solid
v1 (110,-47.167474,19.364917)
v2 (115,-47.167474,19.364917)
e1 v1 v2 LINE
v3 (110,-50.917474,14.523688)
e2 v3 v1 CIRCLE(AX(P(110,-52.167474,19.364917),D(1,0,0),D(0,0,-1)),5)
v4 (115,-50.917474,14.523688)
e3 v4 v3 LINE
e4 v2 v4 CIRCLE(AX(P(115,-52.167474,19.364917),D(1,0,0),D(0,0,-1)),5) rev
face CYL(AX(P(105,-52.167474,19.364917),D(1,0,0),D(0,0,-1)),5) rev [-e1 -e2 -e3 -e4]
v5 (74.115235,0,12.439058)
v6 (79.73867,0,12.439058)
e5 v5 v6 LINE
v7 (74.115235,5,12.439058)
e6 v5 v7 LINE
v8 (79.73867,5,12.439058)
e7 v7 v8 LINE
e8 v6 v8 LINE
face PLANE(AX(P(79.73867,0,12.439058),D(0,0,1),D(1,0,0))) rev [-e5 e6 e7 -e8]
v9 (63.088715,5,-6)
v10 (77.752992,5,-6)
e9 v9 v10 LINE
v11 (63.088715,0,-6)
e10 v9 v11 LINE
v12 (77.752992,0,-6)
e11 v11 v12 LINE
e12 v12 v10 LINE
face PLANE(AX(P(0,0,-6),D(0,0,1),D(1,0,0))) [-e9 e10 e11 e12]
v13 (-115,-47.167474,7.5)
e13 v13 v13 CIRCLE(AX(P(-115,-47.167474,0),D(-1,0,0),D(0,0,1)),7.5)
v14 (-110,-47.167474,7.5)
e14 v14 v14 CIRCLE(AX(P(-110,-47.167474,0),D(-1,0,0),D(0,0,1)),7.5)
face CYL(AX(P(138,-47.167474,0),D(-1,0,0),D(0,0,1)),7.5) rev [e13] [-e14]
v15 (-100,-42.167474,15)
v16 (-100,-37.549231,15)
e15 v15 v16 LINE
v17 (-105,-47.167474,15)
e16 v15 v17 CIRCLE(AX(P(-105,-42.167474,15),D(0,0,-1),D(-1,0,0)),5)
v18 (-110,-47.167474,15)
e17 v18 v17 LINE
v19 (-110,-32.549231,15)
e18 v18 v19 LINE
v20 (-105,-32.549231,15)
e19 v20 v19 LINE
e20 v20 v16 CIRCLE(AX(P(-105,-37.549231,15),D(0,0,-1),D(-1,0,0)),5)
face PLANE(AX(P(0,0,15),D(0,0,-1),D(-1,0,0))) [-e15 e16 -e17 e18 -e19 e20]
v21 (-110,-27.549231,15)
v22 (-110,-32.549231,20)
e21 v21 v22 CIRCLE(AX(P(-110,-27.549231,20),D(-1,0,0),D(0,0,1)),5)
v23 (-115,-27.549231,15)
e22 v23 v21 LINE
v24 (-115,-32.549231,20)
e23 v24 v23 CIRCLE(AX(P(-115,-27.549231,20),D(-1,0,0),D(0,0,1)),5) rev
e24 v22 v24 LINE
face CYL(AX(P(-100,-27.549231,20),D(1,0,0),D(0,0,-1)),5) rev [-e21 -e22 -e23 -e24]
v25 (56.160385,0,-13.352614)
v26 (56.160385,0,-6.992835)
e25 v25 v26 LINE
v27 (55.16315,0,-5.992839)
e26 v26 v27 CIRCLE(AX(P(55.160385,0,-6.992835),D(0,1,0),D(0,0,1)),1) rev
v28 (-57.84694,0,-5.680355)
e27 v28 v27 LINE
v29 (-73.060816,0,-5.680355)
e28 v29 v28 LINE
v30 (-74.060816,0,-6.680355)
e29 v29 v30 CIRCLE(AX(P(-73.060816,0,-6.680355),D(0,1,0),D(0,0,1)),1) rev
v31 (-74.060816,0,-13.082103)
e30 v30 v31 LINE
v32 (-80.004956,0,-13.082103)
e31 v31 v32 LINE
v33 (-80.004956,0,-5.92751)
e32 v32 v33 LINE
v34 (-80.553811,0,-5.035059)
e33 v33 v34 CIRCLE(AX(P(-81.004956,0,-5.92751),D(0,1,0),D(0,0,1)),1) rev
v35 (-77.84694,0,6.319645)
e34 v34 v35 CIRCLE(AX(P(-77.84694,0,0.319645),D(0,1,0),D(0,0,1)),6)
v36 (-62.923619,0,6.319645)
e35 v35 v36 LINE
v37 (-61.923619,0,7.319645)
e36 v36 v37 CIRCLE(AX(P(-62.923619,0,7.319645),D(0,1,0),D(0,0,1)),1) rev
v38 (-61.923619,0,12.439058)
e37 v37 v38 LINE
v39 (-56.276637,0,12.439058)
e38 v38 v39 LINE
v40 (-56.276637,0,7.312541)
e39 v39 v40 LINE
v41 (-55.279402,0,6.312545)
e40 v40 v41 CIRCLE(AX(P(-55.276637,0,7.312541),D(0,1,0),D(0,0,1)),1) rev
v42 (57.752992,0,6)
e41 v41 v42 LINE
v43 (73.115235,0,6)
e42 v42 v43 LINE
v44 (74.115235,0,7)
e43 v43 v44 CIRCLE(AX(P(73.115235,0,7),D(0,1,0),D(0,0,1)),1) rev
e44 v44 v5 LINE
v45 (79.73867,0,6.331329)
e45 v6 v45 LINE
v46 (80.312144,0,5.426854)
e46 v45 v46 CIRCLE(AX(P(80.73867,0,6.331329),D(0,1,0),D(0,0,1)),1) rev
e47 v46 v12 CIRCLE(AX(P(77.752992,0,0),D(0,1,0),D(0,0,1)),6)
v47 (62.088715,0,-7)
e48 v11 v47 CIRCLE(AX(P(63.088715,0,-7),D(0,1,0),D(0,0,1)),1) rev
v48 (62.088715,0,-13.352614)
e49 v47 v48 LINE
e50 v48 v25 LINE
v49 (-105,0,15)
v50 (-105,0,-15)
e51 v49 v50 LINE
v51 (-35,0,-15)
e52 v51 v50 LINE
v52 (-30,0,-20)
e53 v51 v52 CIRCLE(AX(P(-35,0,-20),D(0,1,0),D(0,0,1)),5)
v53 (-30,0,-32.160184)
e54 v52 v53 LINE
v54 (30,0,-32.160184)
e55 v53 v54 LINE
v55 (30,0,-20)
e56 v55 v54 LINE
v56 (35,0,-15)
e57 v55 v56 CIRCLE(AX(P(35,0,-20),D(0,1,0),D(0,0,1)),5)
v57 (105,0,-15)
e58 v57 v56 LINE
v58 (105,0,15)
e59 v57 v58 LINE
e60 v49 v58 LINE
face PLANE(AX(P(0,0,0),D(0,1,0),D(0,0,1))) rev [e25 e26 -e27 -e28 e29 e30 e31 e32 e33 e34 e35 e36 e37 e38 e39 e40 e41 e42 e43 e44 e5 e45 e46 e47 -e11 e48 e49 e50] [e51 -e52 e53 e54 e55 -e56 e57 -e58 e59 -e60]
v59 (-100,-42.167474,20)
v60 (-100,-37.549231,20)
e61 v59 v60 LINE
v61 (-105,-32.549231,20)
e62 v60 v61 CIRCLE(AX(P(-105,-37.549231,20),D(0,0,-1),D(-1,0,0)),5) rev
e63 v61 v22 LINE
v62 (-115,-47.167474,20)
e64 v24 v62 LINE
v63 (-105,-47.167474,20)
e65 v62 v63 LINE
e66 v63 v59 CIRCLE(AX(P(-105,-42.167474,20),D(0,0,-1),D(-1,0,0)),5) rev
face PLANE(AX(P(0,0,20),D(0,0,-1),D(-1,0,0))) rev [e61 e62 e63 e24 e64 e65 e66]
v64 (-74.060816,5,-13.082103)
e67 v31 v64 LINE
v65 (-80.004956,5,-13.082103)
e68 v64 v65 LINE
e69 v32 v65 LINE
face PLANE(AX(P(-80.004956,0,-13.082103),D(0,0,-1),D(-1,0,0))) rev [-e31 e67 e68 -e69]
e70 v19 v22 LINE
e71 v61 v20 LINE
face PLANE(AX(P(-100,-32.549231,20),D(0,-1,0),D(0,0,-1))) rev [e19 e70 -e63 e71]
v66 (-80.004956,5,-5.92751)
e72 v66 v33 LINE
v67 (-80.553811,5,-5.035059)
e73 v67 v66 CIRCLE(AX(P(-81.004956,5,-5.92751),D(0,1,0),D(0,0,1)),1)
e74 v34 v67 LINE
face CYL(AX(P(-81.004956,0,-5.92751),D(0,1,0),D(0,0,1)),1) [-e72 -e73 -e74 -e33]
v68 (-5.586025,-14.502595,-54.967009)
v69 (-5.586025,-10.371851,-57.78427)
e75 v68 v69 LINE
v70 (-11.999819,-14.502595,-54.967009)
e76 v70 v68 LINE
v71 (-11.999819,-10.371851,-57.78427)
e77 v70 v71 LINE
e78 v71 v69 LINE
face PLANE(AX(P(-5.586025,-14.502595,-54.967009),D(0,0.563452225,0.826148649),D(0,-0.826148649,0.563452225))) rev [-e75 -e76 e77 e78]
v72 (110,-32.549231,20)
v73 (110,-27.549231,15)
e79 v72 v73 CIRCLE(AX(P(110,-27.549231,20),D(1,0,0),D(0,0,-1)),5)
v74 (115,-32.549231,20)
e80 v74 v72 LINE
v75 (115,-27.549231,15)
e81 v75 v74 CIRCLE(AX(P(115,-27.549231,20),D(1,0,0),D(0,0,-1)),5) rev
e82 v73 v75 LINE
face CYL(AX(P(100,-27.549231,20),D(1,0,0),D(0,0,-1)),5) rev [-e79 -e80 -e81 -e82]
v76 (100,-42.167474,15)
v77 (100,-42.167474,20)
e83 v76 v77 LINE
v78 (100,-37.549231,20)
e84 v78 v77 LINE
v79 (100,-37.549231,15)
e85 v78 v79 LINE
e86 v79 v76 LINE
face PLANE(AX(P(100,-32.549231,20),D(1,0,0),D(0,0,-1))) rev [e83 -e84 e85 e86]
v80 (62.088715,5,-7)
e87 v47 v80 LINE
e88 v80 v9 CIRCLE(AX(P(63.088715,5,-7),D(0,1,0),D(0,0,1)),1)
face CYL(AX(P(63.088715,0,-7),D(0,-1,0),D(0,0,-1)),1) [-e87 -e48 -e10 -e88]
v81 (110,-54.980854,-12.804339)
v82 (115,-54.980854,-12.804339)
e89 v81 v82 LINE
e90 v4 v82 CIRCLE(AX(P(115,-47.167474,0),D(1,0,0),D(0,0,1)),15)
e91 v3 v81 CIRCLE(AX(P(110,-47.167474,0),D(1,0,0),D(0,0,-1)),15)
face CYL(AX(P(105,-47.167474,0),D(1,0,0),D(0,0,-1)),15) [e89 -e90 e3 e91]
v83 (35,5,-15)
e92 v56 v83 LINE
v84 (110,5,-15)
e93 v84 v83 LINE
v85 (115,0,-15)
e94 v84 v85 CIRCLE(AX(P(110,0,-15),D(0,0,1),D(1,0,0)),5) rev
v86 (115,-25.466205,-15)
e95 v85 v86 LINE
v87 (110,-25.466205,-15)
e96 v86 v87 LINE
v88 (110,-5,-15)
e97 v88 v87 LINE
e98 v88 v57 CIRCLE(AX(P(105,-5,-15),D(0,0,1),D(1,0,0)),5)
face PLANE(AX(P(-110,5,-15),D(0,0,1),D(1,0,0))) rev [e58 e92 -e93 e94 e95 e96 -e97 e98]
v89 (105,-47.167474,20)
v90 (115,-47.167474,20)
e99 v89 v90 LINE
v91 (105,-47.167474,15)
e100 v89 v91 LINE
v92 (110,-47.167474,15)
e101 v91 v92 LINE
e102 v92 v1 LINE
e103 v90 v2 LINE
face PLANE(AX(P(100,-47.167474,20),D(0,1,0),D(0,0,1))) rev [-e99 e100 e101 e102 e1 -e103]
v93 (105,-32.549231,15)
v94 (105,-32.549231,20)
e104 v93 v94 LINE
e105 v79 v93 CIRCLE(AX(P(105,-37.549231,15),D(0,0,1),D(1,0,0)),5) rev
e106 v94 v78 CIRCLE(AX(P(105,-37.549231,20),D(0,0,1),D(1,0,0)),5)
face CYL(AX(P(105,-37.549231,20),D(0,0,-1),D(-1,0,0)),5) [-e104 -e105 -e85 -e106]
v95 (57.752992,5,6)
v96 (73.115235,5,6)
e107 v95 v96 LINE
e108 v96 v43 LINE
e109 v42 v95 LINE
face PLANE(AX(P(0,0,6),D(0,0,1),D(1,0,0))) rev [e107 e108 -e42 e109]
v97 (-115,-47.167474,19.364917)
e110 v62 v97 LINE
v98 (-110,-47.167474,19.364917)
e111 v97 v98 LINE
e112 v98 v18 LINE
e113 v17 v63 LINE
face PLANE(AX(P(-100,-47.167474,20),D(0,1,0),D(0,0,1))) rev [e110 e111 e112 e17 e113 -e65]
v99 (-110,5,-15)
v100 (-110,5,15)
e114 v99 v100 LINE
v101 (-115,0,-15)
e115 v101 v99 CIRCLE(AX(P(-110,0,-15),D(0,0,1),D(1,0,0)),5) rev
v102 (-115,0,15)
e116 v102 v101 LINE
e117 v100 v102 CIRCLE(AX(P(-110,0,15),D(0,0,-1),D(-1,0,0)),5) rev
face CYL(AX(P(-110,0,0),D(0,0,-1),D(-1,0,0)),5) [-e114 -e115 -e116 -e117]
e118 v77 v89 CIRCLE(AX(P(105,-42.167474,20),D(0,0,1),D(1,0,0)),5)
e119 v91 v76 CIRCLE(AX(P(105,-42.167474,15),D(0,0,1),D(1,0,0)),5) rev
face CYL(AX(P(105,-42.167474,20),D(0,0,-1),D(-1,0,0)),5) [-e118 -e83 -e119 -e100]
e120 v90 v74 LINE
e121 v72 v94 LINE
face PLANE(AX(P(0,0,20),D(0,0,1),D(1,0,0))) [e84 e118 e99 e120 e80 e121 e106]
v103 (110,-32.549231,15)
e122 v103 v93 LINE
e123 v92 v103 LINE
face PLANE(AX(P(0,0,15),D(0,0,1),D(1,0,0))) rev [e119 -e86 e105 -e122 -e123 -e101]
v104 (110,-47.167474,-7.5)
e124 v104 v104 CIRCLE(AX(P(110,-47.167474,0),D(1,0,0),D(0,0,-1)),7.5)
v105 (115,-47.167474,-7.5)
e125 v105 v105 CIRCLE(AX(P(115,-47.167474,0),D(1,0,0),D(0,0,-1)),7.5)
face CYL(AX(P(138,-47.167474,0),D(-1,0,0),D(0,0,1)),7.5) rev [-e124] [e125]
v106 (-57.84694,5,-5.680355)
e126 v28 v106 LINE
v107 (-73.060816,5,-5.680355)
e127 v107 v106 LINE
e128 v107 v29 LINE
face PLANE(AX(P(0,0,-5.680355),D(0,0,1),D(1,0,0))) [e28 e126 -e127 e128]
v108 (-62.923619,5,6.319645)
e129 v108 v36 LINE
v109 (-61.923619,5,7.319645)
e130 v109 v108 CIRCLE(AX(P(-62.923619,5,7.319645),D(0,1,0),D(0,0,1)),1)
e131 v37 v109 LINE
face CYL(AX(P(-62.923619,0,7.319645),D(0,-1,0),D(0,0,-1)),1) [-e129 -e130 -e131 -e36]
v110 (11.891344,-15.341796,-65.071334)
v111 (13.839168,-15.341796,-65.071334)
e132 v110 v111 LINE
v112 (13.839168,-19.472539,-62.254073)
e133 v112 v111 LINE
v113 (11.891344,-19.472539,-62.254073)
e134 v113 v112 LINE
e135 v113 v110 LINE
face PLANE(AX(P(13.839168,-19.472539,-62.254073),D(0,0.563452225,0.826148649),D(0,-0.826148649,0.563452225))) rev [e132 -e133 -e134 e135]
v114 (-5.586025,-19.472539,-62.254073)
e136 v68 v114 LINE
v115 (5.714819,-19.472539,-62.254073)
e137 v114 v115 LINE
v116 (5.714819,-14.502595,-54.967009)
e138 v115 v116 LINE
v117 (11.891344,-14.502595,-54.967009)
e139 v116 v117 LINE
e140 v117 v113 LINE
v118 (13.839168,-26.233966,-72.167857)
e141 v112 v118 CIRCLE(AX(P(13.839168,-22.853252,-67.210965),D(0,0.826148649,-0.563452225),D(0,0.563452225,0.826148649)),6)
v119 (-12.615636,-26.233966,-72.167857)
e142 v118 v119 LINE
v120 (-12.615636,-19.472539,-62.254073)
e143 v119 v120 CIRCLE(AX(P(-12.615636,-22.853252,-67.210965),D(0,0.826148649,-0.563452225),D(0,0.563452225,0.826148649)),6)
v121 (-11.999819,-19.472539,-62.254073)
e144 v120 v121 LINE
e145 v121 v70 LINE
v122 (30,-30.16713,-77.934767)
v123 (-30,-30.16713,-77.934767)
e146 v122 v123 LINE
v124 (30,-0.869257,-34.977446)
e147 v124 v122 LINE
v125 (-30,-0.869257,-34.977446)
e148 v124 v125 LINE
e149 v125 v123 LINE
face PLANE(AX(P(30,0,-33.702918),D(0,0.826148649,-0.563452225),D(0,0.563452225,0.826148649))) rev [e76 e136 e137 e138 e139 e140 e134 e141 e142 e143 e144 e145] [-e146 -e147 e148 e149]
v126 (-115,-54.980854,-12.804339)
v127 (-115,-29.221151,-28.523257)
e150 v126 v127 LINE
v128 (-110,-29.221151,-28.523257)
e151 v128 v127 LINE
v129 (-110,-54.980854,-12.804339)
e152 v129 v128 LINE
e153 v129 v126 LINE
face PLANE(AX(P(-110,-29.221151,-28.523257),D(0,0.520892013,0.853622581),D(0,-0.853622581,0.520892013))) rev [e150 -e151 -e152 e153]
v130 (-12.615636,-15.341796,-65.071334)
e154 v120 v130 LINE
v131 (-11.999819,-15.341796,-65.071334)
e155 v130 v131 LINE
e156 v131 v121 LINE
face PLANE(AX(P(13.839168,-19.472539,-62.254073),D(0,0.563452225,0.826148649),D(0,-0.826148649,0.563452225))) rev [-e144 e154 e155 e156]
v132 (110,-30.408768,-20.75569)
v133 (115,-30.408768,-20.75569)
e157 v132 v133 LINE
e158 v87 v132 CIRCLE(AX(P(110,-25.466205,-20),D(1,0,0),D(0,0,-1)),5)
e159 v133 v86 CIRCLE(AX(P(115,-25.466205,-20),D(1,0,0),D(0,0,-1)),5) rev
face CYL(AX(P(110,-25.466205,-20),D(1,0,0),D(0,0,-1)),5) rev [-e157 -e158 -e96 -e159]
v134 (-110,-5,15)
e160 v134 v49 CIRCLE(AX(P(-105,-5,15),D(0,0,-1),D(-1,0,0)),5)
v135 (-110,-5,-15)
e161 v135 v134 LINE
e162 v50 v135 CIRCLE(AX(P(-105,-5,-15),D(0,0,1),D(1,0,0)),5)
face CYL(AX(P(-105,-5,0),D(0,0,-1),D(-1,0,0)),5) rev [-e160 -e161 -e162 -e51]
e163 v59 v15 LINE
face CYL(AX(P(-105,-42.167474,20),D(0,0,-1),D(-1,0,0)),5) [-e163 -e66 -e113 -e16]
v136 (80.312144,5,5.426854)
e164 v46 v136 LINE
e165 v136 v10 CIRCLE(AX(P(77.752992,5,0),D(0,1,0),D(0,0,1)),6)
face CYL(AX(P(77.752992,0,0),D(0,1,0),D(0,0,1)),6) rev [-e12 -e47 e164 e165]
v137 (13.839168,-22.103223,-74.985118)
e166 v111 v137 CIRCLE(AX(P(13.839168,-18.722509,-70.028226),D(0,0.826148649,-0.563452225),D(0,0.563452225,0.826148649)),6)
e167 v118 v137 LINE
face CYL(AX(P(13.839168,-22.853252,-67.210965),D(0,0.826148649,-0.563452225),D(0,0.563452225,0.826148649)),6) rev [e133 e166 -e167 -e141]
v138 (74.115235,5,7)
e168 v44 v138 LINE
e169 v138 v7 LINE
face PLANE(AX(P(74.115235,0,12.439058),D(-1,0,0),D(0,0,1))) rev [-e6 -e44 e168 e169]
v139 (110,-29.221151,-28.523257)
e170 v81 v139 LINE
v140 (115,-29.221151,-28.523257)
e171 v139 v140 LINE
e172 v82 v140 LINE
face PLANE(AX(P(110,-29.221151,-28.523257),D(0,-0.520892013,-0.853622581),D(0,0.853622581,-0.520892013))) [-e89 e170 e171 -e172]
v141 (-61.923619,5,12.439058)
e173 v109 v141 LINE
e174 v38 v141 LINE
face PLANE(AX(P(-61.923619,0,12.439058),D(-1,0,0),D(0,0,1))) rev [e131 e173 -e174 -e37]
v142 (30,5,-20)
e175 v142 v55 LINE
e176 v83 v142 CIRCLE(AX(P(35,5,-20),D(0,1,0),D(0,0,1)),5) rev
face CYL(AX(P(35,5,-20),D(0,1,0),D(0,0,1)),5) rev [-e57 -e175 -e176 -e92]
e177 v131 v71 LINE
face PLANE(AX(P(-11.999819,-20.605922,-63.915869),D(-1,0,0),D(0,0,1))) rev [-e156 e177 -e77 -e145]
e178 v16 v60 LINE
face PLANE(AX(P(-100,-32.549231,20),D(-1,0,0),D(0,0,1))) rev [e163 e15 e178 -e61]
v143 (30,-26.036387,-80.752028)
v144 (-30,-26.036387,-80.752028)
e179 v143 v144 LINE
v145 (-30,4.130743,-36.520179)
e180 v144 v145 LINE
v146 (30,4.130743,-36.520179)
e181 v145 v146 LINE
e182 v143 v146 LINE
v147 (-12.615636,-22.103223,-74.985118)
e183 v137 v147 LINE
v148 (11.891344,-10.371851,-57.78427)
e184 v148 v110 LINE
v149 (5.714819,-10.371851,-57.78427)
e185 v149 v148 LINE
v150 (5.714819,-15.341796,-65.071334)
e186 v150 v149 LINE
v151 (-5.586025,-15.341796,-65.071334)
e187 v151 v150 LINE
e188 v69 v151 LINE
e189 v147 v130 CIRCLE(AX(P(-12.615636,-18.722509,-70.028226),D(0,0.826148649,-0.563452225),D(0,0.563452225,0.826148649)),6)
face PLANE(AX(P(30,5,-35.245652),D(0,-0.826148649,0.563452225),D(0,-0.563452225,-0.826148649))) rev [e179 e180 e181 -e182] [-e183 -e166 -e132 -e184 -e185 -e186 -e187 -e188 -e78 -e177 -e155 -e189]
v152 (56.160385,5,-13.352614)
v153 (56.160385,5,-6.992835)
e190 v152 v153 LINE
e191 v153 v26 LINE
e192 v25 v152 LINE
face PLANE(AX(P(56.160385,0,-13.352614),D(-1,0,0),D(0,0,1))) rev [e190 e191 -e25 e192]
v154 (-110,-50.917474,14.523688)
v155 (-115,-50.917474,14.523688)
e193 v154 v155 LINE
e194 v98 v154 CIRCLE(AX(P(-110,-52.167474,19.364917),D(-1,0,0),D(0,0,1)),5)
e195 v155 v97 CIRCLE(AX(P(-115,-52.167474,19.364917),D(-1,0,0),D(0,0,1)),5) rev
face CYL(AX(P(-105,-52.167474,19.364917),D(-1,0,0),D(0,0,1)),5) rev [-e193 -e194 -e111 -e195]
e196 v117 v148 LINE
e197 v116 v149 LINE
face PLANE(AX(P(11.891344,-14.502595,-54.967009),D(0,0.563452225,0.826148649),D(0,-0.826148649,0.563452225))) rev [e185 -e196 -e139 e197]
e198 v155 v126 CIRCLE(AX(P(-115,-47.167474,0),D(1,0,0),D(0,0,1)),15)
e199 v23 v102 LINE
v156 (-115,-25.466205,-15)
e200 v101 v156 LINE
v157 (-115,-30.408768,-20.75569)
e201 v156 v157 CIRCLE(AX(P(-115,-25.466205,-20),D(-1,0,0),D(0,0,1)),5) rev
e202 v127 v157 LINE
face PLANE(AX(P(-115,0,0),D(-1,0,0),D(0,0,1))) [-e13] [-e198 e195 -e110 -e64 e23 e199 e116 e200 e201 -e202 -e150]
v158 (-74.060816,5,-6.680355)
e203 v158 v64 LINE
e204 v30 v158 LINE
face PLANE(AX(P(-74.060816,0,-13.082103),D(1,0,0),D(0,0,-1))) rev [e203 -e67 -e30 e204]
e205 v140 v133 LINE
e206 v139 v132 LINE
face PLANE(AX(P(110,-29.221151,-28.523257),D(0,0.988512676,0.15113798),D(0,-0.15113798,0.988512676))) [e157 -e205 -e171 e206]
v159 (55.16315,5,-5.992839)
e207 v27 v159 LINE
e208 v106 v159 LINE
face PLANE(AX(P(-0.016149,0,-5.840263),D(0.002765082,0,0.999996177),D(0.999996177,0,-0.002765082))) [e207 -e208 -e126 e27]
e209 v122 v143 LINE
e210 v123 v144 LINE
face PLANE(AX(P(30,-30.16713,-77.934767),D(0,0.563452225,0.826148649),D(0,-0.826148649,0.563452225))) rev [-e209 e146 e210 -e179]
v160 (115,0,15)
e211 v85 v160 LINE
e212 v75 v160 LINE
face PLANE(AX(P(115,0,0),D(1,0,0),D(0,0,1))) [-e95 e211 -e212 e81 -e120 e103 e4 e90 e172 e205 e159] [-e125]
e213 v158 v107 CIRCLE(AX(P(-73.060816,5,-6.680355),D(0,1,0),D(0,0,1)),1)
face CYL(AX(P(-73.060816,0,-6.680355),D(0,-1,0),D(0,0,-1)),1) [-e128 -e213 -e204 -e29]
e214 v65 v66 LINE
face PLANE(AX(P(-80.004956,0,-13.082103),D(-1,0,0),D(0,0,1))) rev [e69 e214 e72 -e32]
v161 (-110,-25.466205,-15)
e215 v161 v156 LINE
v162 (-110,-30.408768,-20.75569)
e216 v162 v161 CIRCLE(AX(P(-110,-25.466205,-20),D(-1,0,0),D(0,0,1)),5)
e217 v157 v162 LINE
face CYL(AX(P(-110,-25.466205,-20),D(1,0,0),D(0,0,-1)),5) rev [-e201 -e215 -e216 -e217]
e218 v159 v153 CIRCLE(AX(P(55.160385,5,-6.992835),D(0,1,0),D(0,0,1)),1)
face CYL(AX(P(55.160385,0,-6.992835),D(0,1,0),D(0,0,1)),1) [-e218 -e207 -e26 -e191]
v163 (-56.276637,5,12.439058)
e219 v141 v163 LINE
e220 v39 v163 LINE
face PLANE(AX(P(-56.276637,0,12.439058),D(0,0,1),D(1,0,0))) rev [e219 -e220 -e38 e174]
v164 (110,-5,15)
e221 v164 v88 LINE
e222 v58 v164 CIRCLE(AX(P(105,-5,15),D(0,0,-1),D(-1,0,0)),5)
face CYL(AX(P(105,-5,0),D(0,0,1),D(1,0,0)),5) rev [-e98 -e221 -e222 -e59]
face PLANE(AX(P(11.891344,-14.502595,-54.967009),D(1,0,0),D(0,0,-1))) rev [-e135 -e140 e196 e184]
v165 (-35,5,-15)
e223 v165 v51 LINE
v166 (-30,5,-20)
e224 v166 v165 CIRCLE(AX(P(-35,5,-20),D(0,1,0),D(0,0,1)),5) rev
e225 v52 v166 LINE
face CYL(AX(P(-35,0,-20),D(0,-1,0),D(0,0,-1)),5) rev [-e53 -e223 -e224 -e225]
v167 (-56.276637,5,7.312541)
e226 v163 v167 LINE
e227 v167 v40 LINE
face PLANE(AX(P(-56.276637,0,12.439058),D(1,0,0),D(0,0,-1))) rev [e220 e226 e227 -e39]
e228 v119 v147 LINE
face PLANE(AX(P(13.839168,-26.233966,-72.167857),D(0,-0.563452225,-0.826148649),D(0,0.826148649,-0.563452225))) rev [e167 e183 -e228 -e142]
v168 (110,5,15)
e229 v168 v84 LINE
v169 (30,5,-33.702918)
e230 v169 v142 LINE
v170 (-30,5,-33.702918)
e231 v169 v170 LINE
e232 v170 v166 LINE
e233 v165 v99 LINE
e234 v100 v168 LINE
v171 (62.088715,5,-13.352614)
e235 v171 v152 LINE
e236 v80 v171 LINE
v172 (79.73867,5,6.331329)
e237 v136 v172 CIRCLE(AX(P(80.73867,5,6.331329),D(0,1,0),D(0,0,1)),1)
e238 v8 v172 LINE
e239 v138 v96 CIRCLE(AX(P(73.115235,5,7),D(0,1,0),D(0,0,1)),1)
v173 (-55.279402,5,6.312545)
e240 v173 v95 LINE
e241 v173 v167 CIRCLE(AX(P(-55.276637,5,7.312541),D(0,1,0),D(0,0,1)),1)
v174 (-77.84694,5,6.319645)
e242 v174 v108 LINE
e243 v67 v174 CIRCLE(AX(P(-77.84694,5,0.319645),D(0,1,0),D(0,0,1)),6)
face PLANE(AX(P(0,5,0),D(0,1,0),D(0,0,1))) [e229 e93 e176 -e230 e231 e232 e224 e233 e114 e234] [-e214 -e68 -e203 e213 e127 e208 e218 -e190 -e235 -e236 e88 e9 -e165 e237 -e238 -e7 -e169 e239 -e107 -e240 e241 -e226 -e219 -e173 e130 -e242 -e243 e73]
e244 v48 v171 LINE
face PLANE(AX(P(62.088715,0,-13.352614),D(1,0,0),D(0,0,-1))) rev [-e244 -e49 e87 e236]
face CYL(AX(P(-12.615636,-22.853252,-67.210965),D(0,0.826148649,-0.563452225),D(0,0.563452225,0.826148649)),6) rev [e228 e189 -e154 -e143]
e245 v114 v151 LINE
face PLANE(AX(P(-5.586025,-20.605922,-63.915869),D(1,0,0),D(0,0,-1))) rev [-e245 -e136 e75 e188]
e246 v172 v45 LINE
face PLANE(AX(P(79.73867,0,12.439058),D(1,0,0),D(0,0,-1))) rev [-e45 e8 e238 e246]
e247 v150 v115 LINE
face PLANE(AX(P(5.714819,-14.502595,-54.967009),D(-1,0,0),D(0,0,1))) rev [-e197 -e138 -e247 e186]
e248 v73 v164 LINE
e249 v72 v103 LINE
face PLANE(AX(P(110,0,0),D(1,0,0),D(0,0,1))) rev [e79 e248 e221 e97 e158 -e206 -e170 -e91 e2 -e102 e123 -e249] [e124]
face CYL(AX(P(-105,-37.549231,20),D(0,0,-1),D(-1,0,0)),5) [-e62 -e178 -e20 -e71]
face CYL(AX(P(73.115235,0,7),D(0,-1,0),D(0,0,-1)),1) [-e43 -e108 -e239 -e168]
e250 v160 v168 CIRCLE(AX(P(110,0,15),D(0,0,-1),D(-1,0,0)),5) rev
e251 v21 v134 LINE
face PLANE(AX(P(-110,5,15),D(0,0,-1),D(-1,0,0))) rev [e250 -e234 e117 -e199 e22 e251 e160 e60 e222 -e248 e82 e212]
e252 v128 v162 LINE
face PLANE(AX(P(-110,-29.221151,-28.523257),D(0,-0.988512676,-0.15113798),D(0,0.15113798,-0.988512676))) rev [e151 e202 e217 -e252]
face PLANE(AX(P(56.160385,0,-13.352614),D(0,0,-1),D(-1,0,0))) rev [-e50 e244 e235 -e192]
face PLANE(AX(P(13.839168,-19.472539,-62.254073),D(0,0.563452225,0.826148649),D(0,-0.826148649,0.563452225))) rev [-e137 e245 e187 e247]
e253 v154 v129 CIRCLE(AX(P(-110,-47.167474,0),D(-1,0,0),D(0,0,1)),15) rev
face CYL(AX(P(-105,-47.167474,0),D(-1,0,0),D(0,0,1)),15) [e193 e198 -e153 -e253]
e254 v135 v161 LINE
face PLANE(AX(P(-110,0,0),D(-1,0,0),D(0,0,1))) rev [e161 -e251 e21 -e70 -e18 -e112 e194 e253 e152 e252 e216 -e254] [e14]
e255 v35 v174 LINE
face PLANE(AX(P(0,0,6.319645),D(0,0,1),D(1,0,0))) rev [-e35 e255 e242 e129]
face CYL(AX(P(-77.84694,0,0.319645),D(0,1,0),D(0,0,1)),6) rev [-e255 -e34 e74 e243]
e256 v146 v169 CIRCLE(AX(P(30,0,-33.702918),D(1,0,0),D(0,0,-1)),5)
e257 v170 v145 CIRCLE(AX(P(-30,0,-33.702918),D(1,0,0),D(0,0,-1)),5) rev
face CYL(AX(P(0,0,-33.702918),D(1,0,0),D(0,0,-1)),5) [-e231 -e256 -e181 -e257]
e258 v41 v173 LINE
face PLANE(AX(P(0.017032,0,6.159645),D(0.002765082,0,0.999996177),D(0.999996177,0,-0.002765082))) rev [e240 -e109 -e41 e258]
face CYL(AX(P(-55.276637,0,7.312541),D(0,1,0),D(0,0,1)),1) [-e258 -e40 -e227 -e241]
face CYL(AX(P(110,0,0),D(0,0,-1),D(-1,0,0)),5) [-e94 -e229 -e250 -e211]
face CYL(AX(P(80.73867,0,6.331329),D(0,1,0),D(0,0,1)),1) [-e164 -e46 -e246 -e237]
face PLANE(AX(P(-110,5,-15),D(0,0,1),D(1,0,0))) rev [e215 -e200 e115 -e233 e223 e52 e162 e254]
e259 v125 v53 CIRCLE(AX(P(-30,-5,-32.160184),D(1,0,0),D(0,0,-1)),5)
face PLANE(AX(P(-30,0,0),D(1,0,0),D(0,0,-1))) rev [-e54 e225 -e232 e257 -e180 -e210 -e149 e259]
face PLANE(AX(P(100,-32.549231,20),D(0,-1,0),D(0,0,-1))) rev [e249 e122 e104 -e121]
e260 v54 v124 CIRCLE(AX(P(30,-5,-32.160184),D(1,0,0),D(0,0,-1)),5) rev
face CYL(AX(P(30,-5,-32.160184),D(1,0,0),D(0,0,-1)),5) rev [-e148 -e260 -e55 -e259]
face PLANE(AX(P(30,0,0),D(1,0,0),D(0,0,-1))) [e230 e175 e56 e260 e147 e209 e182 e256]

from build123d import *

# Parameters (mm, degrees)
SKETCH1_W           = 220
SKETCH1_H           = 30
BOSS_EXTRUDE1_DEPTH = 5
SKETCH2_W           = 30
SKETCH2_H           = 70
BOSS_EXTRUDE2_DEPTH = 5
CUT_EXTRUDE1_DEPTH  = 10
BOSS_EXTRUDE3_DEPTH = 5
BOSS_EXTRUDE4_DEPTH = 30
FILLET1_R           = 5
SKETCH7_R           = 7.5
CUT_EXTRUDE2_DEPTH  = 253
SKETCH8_W           = 15
SKETCH8_H           = 14.618243145
BOSS_EXTRUDE5_DEPTH = 5
FILLET2_R           = 5
CUT_EXTRUDE3_DEPTH  = 5
SKETCH10_W          = 5.944140112
SKETCH10_H          = 11.167837108
SKETCH10_W_2        = 5.92832961
SKETCH10_H_2        = 9.506983552
CUT_EXTRUDE4_DEPTH  = 5
SKETCH11_W          = 5.623434756
SKETCH11_H          = 8.337110403
SKETCH11_W_2        = 5.64698147
SKETCH11_H_2        = 9.10404701
CUT_EXTRUDE5_DEPTH  = 5
FILLET3_R           = 1
CUT_EXTRUDE6_DEPTH  = 5
SKETCH13_W          = 6.176524638
SKETCH13_H          = 11.481735796
SKETCH13_W_2        = 6.413794009
SKETCH13_H_2        = 10.832022022
CUT_EXTRUDE7_DEPTH  = 5


with BuildPart() as part:
    # Sketch1 → Boss-Extrude1 (new body)
    with BuildSketch(Plane(origin=(0, 0, 0), x_dir=(1, 0, 0), z_dir=(0, 1, 0))):
        Rectangle(SKETCH1_W, SKETCH1_H)
    extrude(amount=BOSS_EXTRUDE1_DEPTH)

    # Sketch2 → Boss-Extrude2 (add)
    with BuildSketch(Plane.ZY.offset(110)):
        with Locations((0, -30)):
            Rectangle(SKETCH2_W, SKETCH2_H)
    boss_extrude2 = extrude(amount=BOSS_EXTRUDE2_DEPTH)

    # Mirror1: Boss-Extrude2 across plane
    add(boss_extrude2.mirror(Plane(origin=(0, 0, 0), x_dir=(0, 0, 1), z_dir=(1, 0, 0))))

    # Sketch4 → Cut-Extrude1 (cut)
    with BuildSketch(Plane.ZY.offset(115)):
        with BuildLine():
            Line((-15, -47.167473829), (-15, -65))
            Line((-15, -65), (15, -65))
            Line((15, -65), (15, -47.167473829))
            ThreePointArc((15, -47.167473829), (0, -62.167473829), (-15, -47.167473829))
        make_face()
    cut_extrude1 = extrude(amount=-CUT_EXTRUDE1_DEPTH, mode=Mode.SUBTRACT)

    # Mirror2: Cut-Extrude1 across plane
    add(cut_extrude1.mirror(Plane(origin=(0, 0, 0), x_dir=(0, 0, 1), z_dir=(1, 0, 0))), mode=Mode.SUBTRACT)

    # Sketch5 → Boss-Extrude3 (add)
    with BuildSketch(Plane(origin=(115, 0, 0), x_dir=(0, 0, -1), z_dir=(1, 0, 0))):
        with BuildLine():
            Line((28.523256762, -29.22115135), (15, -31.288780588))
            Line((15, -31.288780588), (-5.201478884, -40.890888071))
            Line((-5.201478884, -40.890888071), (-4.123987776, -59.07486744))
            Line((-4.123987776, -59.07486744), (0, -62.167473829))
            ThreePointArc((0, -62.167473829), (7.341637998, -60.248007132), (12.804338712, -54.98085403))
            Line((12.804338712, -54.98085403), (28.523256762, -29.22115135))
        make_face()
    boss_extrude3 = extrude(amount=-BOSS_EXTRUDE3_DEPTH)

    # Mirror3: Boss-Extrude3 across plane
    add(boss_extrude3.mirror(Plane(origin=(0, 0, 0), x_dir=(0, 0, 1), z_dir=(1, 0, 0))))

    # Sketch6 → Boss-Extrude4 (add, symmetric)
    with BuildSketch(Plane(origin=(0, 0, 0), x_dir=(0, 0, -1), z_dir=(1, 0, 0))):
        Polygon((12.470905957, 5), (35.245651902, 5), (80.752027939, -26.036386601), (77.934766812, -30.167129844), (33.702918166, 0), (12.470905957, 0), align=None)
    extrude(amount=BOSS_EXTRUDE4_DEPTH, both=True)

    # Fillet1
    fillet1_edges = [part.edges().sort_by_distance(p)[0] for p in [
        (-112.5, -31.288780588, -15),
        (0, 5, -35.245651902),
        (-30, 2.5, -15),
        (0, 0, -33.702918166),
        (30, 2.5, -15),
        (-115, 5, 0),
        (115, 5, 0),
        (-110, 0, 0),
        (110, 0, 0),
        (112.5, -31.288780588, -15),
    ]]
    fillet(fillet1_edges, radius=FILLET1_R)

    # Sketch7 → Cut-Extrude2 (cut)
    with BuildSketch(Plane.ZY.offset(115)):
        with Locations((0, -47.167473829)):
            Circle(SKETCH7_R)
    extrude(amount=-CUT_EXTRUDE2_DEPTH, mode=Mode.SUBTRACT)

    # Sketch8 → Boss-Extrude5 (add)
    with BuildSketch(Plane.XY.offset(15)):
        with Locations((-107.5, -39.858352256)):
            Rectangle(SKETCH8_W, SKETCH8_H)
        with Locations((107.5, -39.858352256)):
            Rectangle(SKETCH8_W, SKETCH8_H)
    extrude(amount=BOSS_EXTRUDE5_DEPTH)

    # Fillet2
    fillet2_edges = [part.edges().sort_by_distance(p)[0] for p in [
        (100, -47.167473829, 17.5),
        (100, -32.549230684, 17.5),
        (112.5, -32.549230684, 15),
        (112.5, -47.167473829, 15),
        (-100, -47.167473829, 17.5),
        (-100, -32.549230684, 17.5),
        (-112.5, -47.167473829, 15),
        (-112.5, -32.549230684, 15),
    ]]
    fillet(fillet2_edges, radius=FILLET2_R - 0.0001)  # a hair under: the kernel refuses the full size

    # Sketch9 → Cut-Extrude3 (cut)
    with BuildSketch(Plane(origin=(0, 5, 0), x_dir=(1, 0, 0), z_dir=(0, 1, 0))):
        with BuildLine():
            Line((-77.846940142, 5.680355486), (-57.846940142, 5.680355486))
            Line((-57.846940142, 5.680355486), (57.752992387, 6))
            Line((57.752992387, 6), (77.752992387, 6))
            ThreePointArc((77.752992387, 6), (83.752992387, 0), (77.752992387, -6))
            Line((77.752992387, -6), (57.752992387, -6))
            Line((57.752992387, -6), (-57.846940142, -6.319644514))
            Line((-57.846940142, -6.319644514), (-77.846940142, -6.319644514))
            ThreePointArc((-77.846940142, -6.319644514), (-83.846940142, -0.319644514), (-77.846940142, 5.680355486))
        make_face()
    extrude(amount=-CUT_EXTRUDE3_DEPTH, mode=Mode.SUBTRACT)

    # Sketch10 → Cut-Extrude4 (cut)
    with BuildSketch(Plane(origin=(0, 5, 0), x_dir=(1, 0, 0), z_dir=(0, 1, 0))):
        with Locations((-77.032885662, 7.498184757)):
            Rectangle(SKETCH10_W, SKETCH10_H)
        with Locations((59.124549755, 8.599122626)):
            Rectangle(SKETCH10_W_2, SKETCH10_H_2)
    extrude(amount=-CUT_EXTRUDE4_DEPTH, mode=Mode.SUBTRACT)

    # Sketch11 → Cut-Extrude5 (cut)
    with BuildSketch(Plane(origin=(0, 5, 0), x_dir=(1, 0, 0), z_dir=(0, 1, 0))):
        with Locations((76.926952234, -8.270502887)):
            Rectangle(SKETCH11_W, SKETCH11_H)
        with Locations((-59.100127848, -7.887034583)):
            Rectangle(SKETCH11_W_2, SKETCH11_H_2)
    extrude(amount=-CUT_EXTRUDE5_DEPTH, mode=Mode.SUBTRACT)

    # Fillet3
    fillet3_edges = [part.edges().sort_by_distance(p)[0] for p in [
        (-80.004955718, 2.5, -5.278834634),
        (62.08871456, 2.5, -6),
        (56.16038495, 2.5, -5.995596293),
        (-74.060815606, 2.5, -5.680355486),
        (-61.923618583, 2.5, 6.319644514),
        (-56.276637113, 2.5, 6.31530248),
        (74.115234856, 2.5, 6),
        (79.738669612, 2.5, 5.661897735),
    ]]
    fillet(fillet3_edges, radius=FILLET3_R)

    # Sketch12 → Cut-Extrude6 (cut)
    with BuildSketch(Plane(origin=(0, 19.819293064, -13.51721001), x_dir=(1, 0, 0), z_dir=(0, 0.8261486486486485, -0.563452225424669))):
        with BuildLine():
            Line((13.839167564, 62.402963996), (-12.615635754, 62.402963996))
            ThreePointArc((-12.615635754, 62.402963996), (-18.615635754, 68.402963996), (-12.615635754, 74.402963996))
            Line((-12.615635754, 74.402963996), (13.839167564, 74.402963996))
            ThreePointArc((13.839167564, 74.402963996), (19.839167564, 68.402963996), (13.839167564, 62.402963996))
        make_face()
    extrude(amount=-CUT_EXTRUDE6_DEPTH, mode=Mode.SUBTRACT)

    # Sketch13 → Cut-Extrude7 (cut)
    with BuildSketch(Plane(origin=(0, 19.819293064, -13.51721001), x_dir=(1, 0, 0), z_dir=(0, 0.8261486486486485, -0.563452225424669))):
        with Locations((8.803081479, 59.323306986)):
            Rectangle(SKETCH13_W, SKETCH13_H)
        with Locations((-8.792921623, 58.998450099)):
            Rectangle(SKETCH13_W_2, SKETCH13_H_2)
    extrude(amount=-CUT_EXTRUDE7_DEPTH, mode=Mode.SUBTRACT)


solid = part.part
